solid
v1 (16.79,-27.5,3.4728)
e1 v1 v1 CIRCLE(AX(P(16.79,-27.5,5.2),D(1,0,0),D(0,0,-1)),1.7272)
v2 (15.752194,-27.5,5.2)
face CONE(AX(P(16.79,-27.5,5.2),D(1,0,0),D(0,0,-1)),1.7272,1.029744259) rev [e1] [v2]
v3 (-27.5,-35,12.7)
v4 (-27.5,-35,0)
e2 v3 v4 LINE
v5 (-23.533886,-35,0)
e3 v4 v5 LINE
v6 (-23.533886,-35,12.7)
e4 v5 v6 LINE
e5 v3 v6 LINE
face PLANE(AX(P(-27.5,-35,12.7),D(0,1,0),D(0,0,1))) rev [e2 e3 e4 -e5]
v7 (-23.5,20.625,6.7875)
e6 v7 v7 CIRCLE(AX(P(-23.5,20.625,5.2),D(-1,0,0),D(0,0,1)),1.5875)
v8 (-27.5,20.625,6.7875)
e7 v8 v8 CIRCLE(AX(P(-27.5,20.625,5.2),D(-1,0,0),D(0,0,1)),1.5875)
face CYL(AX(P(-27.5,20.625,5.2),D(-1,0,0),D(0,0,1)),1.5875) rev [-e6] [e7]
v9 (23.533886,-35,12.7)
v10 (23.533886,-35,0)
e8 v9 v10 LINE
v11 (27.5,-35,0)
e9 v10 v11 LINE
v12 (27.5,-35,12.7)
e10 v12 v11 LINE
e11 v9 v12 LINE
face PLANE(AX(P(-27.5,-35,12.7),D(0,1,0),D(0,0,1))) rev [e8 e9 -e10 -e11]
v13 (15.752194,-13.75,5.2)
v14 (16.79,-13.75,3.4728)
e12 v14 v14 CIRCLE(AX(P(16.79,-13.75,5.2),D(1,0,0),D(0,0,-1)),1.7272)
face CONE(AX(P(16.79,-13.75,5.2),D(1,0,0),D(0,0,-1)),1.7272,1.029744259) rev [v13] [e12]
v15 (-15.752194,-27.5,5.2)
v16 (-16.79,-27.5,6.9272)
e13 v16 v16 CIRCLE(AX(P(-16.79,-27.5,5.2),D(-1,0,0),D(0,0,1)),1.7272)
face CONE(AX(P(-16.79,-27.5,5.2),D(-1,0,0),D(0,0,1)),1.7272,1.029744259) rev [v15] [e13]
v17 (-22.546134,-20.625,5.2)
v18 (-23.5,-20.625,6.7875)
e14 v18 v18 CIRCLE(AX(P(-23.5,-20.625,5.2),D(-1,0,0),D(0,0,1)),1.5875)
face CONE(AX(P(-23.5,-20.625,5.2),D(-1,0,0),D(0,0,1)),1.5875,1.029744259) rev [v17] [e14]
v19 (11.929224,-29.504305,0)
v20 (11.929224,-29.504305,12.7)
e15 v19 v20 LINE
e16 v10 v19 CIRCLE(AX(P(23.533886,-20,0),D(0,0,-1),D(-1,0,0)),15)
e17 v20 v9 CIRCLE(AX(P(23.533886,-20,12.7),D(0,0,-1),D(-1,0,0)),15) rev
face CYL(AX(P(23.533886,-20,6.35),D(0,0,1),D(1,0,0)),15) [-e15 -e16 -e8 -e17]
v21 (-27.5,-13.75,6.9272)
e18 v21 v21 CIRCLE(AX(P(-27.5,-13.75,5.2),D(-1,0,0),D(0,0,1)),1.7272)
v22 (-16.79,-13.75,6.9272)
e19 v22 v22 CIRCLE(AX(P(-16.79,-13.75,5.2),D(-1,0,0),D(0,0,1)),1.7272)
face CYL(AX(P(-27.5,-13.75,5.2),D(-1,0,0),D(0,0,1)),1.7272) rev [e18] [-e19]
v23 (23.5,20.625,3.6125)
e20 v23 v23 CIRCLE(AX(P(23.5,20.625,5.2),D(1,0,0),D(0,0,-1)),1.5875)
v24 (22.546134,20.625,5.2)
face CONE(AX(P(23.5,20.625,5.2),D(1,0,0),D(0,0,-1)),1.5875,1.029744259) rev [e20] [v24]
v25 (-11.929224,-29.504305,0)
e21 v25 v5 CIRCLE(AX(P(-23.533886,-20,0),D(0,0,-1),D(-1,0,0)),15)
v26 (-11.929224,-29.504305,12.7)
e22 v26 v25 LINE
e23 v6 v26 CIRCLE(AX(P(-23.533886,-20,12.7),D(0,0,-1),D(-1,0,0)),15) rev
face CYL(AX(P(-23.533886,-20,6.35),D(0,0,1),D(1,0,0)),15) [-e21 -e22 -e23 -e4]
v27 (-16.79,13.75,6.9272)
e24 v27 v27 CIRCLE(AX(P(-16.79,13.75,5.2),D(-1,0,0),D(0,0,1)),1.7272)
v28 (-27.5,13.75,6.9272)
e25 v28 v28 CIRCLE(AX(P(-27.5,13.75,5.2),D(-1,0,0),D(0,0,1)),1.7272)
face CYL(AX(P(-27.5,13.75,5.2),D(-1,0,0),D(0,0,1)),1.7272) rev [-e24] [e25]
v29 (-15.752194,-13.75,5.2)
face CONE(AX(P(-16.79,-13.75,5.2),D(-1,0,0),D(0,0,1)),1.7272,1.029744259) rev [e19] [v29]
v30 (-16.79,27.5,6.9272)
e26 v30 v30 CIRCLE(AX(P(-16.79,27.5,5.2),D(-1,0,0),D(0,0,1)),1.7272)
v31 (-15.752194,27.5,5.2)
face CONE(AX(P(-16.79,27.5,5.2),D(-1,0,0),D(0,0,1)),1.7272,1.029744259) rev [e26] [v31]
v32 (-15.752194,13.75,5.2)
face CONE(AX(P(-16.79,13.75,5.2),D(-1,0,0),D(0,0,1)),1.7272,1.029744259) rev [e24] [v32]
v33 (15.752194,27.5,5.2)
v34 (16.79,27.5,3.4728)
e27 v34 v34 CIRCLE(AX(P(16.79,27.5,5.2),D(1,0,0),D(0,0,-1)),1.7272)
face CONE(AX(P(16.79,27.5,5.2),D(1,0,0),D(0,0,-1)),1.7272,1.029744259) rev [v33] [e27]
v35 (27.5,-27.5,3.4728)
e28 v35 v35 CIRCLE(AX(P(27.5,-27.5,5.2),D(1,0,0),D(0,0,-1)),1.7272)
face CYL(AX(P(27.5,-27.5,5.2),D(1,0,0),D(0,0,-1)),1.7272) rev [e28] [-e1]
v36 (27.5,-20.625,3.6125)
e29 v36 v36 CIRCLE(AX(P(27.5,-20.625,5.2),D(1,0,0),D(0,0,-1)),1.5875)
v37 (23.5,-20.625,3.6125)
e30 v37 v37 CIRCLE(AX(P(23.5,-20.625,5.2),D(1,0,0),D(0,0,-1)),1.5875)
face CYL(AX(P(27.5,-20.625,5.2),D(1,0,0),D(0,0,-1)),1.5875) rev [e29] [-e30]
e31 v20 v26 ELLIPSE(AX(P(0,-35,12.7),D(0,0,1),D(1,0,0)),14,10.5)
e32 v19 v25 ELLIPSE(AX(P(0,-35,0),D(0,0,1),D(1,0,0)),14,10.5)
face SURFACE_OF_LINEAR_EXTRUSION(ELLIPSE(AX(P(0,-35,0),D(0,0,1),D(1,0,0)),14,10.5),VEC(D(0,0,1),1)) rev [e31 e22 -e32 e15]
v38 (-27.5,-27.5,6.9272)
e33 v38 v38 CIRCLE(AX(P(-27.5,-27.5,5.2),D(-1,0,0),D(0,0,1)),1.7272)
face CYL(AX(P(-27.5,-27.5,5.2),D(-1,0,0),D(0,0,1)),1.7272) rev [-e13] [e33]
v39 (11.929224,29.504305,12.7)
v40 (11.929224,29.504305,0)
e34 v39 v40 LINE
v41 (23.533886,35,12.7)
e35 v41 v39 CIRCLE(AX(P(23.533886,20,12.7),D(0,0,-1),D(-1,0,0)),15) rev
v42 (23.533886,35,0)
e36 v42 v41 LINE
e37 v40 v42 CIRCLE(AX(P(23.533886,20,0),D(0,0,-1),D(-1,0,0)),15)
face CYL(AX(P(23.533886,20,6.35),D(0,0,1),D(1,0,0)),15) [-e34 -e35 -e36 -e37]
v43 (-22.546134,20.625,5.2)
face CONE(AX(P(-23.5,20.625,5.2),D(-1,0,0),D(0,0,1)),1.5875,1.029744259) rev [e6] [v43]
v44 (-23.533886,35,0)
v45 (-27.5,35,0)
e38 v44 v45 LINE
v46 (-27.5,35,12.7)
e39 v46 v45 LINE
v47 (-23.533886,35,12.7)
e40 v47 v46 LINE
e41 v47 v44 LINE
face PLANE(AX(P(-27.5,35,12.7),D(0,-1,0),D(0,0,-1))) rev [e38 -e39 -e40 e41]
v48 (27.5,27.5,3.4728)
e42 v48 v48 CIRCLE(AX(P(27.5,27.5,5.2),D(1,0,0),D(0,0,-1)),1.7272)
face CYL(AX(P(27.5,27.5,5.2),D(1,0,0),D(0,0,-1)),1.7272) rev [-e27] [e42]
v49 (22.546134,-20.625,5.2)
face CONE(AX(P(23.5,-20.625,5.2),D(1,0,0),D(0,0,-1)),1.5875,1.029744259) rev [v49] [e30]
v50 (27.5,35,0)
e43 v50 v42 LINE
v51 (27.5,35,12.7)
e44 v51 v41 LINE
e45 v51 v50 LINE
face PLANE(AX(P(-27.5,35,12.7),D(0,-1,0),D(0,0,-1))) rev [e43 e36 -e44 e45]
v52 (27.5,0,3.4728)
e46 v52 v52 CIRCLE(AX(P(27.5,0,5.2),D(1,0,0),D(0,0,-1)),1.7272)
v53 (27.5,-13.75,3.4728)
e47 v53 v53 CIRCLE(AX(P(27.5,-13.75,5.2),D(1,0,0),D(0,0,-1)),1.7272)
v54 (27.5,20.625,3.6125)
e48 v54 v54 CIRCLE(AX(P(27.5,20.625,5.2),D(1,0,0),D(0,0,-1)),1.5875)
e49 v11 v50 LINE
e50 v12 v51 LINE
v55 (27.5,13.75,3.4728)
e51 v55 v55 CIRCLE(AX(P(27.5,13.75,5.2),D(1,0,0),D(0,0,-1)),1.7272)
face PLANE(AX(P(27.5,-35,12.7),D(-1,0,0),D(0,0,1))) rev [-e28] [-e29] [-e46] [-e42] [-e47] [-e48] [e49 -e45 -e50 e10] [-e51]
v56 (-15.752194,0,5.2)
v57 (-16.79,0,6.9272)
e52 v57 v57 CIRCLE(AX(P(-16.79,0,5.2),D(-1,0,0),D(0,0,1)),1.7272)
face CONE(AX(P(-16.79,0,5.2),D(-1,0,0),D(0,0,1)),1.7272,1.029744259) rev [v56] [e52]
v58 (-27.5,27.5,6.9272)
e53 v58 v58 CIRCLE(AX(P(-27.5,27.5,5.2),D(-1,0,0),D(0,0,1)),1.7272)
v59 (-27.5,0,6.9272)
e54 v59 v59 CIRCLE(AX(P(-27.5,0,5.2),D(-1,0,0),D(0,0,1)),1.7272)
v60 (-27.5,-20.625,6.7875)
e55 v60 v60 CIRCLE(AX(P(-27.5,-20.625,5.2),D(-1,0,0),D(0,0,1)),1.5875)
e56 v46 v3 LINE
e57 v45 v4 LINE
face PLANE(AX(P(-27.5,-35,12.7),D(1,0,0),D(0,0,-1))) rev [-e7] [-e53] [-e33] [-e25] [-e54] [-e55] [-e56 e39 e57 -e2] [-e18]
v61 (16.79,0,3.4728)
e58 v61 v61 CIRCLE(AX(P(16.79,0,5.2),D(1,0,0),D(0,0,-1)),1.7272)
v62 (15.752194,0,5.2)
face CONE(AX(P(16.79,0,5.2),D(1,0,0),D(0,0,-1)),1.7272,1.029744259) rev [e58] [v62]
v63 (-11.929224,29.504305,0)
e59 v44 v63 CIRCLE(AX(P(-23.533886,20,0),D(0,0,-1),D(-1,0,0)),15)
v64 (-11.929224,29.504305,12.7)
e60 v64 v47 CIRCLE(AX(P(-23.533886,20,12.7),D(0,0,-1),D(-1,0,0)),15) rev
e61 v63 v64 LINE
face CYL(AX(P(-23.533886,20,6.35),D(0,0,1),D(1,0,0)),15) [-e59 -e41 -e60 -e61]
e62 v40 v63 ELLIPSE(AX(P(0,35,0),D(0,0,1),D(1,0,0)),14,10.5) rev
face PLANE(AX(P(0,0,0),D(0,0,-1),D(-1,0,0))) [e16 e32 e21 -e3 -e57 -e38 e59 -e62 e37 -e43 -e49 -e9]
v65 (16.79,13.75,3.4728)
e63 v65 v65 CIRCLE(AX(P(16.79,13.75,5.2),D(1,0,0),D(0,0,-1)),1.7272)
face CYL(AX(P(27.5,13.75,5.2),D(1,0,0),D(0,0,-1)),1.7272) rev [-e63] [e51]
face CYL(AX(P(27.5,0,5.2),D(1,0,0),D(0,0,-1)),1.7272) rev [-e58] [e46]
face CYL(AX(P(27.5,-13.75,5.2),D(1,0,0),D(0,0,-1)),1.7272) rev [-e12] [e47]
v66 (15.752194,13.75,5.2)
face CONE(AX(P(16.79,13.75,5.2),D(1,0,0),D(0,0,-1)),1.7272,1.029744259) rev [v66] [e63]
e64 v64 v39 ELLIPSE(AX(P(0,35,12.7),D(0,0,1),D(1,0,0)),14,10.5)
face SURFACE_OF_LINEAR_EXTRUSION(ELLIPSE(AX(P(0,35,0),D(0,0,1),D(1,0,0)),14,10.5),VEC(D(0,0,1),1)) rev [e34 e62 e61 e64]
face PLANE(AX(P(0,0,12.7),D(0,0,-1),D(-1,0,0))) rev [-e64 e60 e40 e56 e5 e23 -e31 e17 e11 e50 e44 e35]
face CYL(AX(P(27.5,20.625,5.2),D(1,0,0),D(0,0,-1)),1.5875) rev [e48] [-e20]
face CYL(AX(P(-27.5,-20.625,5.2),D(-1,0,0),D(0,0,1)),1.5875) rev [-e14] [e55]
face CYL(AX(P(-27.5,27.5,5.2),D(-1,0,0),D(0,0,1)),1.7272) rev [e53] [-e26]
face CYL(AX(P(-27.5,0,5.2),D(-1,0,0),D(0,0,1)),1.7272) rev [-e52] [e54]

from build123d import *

# Parameters (mm, degrees)
SKETCH1_W                           = 55
SKETCH1_H                           = 70
BOSS_EXTRUDE1_DEPTH                 = 12.7
SKETCH21_RX                         = 14
SKETCH21_RY                         = 10.5
CUT_EXTRUDE1_DEPTH                  = 47.287579328
FILLET2_START                       = -1
FILLET2_DEPTH                       = 15
F_8_32_TAPPED_HOLE1_AT_2_COUNT      = 2
F_8_32_TAPPED_HOLE1_AT_2_PITCH      = 13.75
F_8_32_TAPPED_HOLE1_AT_3_COUNT      = 2
F_8_32_TAPPED_HOLE1_AT_3_PITCH      = 27.5
F_8_32_TAPPED_HOLE1_AT_4_COUNT      = 2
F_8_32_TAPPED_HOLE1_AT_4_PITCH      = 55
F_8_32_TAPPED_HOLE1_AT_5_COUNT      = 2
F_8_32_TAPPED_HOLE1_AT_5_PITCH      = 41.25
F_1_8_0_1250_DOWEL_HOLE1_AT_2_COUNT = 2
F_1_8_0_1250_DOWEL_HOLE1_AT_2_PITCH = 41.25


with BuildPart() as part:
    # Sketch1 → Boss-Extrude1 (new body)
    with BuildSketch(Plane.XY):
        Rectangle(SKETCH1_W, SKETCH1_H)
    extrude(amount=BOSS_EXTRUDE1_DEPTH)

    # Sketch21 → Cut-Extrude1 (cut, through all)
    with BuildSketch(Plane.XY.offset(12.7)):
        with Locations((0, 35)):
            Ellipse(SKETCH21_RX, SKETCH21_RY)
        with Locations((0, -35)):
            Ellipse(SKETCH21_RX, SKETCH21_RY)
    extrude(amount=-CUT_EXTRUDE1_DEPTH, mode=Mode.SUBTRACT)

    # Fillet2: read off the stored shape, not the designer's step
    # Fillet2 outline → Fillet2 (cut)
    with BuildSketch(Plane.XY.offset(FILLET2_START)):
        with BuildLine():
            ThreePointArc((-23.533885883, 35), (-17.113783845, 33.556632687), (-11.929223863, 29.504305309))
            add(Edge.make_bspline(
                [(-14, 35), (-14, 32.032702325), (-11.929223863, 29.504305309)],
                knots=[3.141592654, 3.141592654, 3.141592654, 3.703586408, 3.703586408, 3.703586408], degree=2, weights=[1, 0.895209737, 0.865402427]))
            Line((-14, 35), (-23.533885883, 35))
        make_face()
        with BuildLine():
            add(Edge.make_bspline(
                [(11.929223863, 29.504305309), (14, 32.032702325), (14, 35)],
                knots=[5.721191552, 5.721191552, 5.721191552, 6.283185307, 6.283185307, 6.283185307], degree=2, weights=[0.865402427, 0.895209737, 1]))
            ThreePointArc((11.929223863, 29.504305309), (17.113783845, 33.556632687), (23.533885883, 35))
            Line((23.533885883, 35), (14, 35))
        make_face()
        with BuildLine():
            ThreePointArc((23.533885883, -35), (17.113783845, -33.556632687), (11.929223863, -29.504305309))
            add(Edge.make_bspline(
                [(14, -35), (14, -32.032702325), (11.929223863, -29.504305309)],
                knots=[0, 0, 0, 0.561993755, 0.561993755, 0.561993755], degree=2, weights=[1, 0.895209737, 0.865402427]))
            Line((14, -35), (23.533885883, -35))
        make_face()
        with BuildLine():
            add(Edge.make_bspline(
                [(-11.929223863, -29.504305309), (-14, -32.032702325), (-14, -35)],
                knots=[2.579598899, 2.579598899, 2.579598899, 3.141592654, 3.141592654, 3.141592654], degree=2, weights=[0.865402427, 0.895209737, 1]))
            ThreePointArc((-11.929223863, -29.504305309), (-17.113783845, -33.556632687), (-23.533885883, -35))
            Line((-23.533885883, -35), (-14, -35))
        make_face()
    extrude(amount=FILLET2_DEPTH, mode=Mode.SUBTRACT)

    # Sketch16 → #8-32 Tapped Hole1 (revolve, cut)
    with BuildSketch(Plane(origin=(27.5, -27.5, 5.2), x_dir=(0, 0, -1), z_dir=(0, 1, 0))):
        Polygon((0, 0), (0, 11.747806461), (1.7272, 10.71), (1.7272, 0), align=None)
    f_8_32_tapped_hole1 = revolve(axis=Axis((33.85, -27.5, 5.2), (-1, 0, 0)), mode=Mode.SUBTRACT)

    # #8-32 Tapped Hole1 at 2: #8-32 Tapped Hole1 ×2
    with Locations(*[(0, i * F_8_32_TAPPED_HOLE1_AT_2_PITCH, 0) for i in range(1, F_8_32_TAPPED_HOLE1_AT_2_COUNT)]):
        add(f_8_32_tapped_hole1, mode=Mode.SUBTRACT)

    # #8-32 Tapped Hole1 at 3: #8-32 Tapped Hole1 ×2
    with Locations(*[(0, i * F_8_32_TAPPED_HOLE1_AT_3_PITCH, 0) for i in range(1, F_8_32_TAPPED_HOLE1_AT_3_COUNT)]):
        add(f_8_32_tapped_hole1, mode=Mode.SUBTRACT)

    # #8-32 Tapped Hole1 at 4: #8-32 Tapped Hole1 ×2
    with Locations(*[(0, i * F_8_32_TAPPED_HOLE1_AT_4_PITCH, 0) for i in range(1, F_8_32_TAPPED_HOLE1_AT_4_COUNT)]):
        add(f_8_32_tapped_hole1, mode=Mode.SUBTRACT)

    # #8-32 Tapped Hole1 at 5: #8-32 Tapped Hole1 ×2
    with Locations(*[(0, i * F_8_32_TAPPED_HOLE1_AT_5_PITCH, 0) for i in range(1, F_8_32_TAPPED_HOLE1_AT_5_COUNT)]):
        add(f_8_32_tapped_hole1, mode=Mode.SUBTRACT)

    # Sketch20 → 1/8 (0.1250) Dowel Hole1 (revolve, cut)
    with BuildSketch(Plane(origin=(27.5, -20.625, 5.2), x_dir=(0, 0, -1), z_dir=(0, 1, 0))):
        Polygon((0, 0), (0, 4.953866233), (1.5875, 4), (1.5875, 0), align=None)
    f_1_8_0_1250_dowel_hole1 = revolve(axis=Axis((33.85, -20.625, 5.2), (-1, 0, 0)), mode=Mode.SUBTRACT)

    # 1/8 (0.1250) Dowel Hole1 at 2: 1/8 (0.1250) Dowel Hole1 ×2
    with Locations(*[(0, i * F_1_8_0_1250_DOWEL_HOLE1_AT_2_PITCH, 0) for i in range(1, F_1_8_0_1250_DOWEL_HOLE1_AT_2_COUNT)]):
        add(f_1_8_0_1250_dowel_hole1, mode=Mode.SUBTRACT)

    # Mirror1: #8-32 Tapped Hole1, 1/8 (0.1250) Dowel Hole1 across plane
    add(f_8_32_tapped_hole1.mirror(Plane(origin=(0, 0, 0), x_dir=(0, 0, 1), z_dir=(1, 0, 0))), mode=Mode.SUBTRACT)
    add(f_1_8_0_1250_dowel_hole1.mirror(Plane(origin=(0, 0, 0), x_dir=(0, 0, 1), z_dir=(1, 0, 0))), mode=Mode.SUBTRACT)

    # Mirror1 copy 1 sketch → Mirror1 copy 1 (revolve, cut)
    with BuildSketch(Plane(origin=(-27.5, -13.75, 5.2), x_dir=(0, 0, -1), z_dir=(0, 1, 0))):
        Polygon((0, 0), (0, -11.747806461), (1.7272, -10.71), (1.7272, 0), align=None)
    revolve(axis=Axis((-33.85, -13.75, 5.2), (-1, 0, 0)), mode=Mode.SUBTRACT)

    # Mirror1 copy 2 sketch → Mirror1 copy 2 (revolve, cut)
    with BuildSketch(Plane(origin=(-27.5, 0, 5.2), x_dir=(0, 0, -1), z_dir=(0, 1, 0))):
        Polygon((0, 0), (0, -11.747806461), (1.7272, -10.71), (1.7272, 0), align=None)
    revolve(axis=Axis((-33.85, 0, 5.2), (-1, 0, 0)), mode=Mode.SUBTRACT)

    # Mirror1 copy 3 sketch → Mirror1 copy 3 (revolve, cut)
    with BuildSketch(Plane(origin=(-27.5, 27.5, 5.2), x_dir=(0, 0, -1), z_dir=(0, 1, 0))):
        Polygon((0, 0), (0, -11.747806461), (1.7272, -10.71), (1.7272, 0), align=None)
    revolve(axis=Axis((-33.85, 27.5, 5.2), (-1, 0, 0)), mode=Mode.SUBTRACT)

    # Mirror1 copy 4 sketch → Mirror1 copy 4 (revolve, cut)
    with BuildSketch(Plane(origin=(-27.5, 13.75, 5.2), x_dir=(0, 0, -1), z_dir=(0, 1, 0))):
        Polygon((0, 0), (0, -11.747806461), (1.7272, -10.71), (1.7272, 0), align=None)
    revolve(axis=Axis((-33.85, 13.75, 5.2), (-1, 0, 0)), mode=Mode.SUBTRACT)

    # Mirror1 copy 5 sketch → Mirror1 copy 5 (revolve, cut)
    with BuildSketch(Plane(origin=(-27.5, 20.625, 5.2), x_dir=(0, 0, -1), z_dir=(0, 1, 0))):
        Polygon((0, 0), (0, -4.953866233), (1.5875, -4), (1.5875, 0), align=None)
    revolve(axis=Axis((-33.85, 20.625, 5.2), (-1, 0, 0)), mode=Mode.SUBTRACT)


solid = part.part
